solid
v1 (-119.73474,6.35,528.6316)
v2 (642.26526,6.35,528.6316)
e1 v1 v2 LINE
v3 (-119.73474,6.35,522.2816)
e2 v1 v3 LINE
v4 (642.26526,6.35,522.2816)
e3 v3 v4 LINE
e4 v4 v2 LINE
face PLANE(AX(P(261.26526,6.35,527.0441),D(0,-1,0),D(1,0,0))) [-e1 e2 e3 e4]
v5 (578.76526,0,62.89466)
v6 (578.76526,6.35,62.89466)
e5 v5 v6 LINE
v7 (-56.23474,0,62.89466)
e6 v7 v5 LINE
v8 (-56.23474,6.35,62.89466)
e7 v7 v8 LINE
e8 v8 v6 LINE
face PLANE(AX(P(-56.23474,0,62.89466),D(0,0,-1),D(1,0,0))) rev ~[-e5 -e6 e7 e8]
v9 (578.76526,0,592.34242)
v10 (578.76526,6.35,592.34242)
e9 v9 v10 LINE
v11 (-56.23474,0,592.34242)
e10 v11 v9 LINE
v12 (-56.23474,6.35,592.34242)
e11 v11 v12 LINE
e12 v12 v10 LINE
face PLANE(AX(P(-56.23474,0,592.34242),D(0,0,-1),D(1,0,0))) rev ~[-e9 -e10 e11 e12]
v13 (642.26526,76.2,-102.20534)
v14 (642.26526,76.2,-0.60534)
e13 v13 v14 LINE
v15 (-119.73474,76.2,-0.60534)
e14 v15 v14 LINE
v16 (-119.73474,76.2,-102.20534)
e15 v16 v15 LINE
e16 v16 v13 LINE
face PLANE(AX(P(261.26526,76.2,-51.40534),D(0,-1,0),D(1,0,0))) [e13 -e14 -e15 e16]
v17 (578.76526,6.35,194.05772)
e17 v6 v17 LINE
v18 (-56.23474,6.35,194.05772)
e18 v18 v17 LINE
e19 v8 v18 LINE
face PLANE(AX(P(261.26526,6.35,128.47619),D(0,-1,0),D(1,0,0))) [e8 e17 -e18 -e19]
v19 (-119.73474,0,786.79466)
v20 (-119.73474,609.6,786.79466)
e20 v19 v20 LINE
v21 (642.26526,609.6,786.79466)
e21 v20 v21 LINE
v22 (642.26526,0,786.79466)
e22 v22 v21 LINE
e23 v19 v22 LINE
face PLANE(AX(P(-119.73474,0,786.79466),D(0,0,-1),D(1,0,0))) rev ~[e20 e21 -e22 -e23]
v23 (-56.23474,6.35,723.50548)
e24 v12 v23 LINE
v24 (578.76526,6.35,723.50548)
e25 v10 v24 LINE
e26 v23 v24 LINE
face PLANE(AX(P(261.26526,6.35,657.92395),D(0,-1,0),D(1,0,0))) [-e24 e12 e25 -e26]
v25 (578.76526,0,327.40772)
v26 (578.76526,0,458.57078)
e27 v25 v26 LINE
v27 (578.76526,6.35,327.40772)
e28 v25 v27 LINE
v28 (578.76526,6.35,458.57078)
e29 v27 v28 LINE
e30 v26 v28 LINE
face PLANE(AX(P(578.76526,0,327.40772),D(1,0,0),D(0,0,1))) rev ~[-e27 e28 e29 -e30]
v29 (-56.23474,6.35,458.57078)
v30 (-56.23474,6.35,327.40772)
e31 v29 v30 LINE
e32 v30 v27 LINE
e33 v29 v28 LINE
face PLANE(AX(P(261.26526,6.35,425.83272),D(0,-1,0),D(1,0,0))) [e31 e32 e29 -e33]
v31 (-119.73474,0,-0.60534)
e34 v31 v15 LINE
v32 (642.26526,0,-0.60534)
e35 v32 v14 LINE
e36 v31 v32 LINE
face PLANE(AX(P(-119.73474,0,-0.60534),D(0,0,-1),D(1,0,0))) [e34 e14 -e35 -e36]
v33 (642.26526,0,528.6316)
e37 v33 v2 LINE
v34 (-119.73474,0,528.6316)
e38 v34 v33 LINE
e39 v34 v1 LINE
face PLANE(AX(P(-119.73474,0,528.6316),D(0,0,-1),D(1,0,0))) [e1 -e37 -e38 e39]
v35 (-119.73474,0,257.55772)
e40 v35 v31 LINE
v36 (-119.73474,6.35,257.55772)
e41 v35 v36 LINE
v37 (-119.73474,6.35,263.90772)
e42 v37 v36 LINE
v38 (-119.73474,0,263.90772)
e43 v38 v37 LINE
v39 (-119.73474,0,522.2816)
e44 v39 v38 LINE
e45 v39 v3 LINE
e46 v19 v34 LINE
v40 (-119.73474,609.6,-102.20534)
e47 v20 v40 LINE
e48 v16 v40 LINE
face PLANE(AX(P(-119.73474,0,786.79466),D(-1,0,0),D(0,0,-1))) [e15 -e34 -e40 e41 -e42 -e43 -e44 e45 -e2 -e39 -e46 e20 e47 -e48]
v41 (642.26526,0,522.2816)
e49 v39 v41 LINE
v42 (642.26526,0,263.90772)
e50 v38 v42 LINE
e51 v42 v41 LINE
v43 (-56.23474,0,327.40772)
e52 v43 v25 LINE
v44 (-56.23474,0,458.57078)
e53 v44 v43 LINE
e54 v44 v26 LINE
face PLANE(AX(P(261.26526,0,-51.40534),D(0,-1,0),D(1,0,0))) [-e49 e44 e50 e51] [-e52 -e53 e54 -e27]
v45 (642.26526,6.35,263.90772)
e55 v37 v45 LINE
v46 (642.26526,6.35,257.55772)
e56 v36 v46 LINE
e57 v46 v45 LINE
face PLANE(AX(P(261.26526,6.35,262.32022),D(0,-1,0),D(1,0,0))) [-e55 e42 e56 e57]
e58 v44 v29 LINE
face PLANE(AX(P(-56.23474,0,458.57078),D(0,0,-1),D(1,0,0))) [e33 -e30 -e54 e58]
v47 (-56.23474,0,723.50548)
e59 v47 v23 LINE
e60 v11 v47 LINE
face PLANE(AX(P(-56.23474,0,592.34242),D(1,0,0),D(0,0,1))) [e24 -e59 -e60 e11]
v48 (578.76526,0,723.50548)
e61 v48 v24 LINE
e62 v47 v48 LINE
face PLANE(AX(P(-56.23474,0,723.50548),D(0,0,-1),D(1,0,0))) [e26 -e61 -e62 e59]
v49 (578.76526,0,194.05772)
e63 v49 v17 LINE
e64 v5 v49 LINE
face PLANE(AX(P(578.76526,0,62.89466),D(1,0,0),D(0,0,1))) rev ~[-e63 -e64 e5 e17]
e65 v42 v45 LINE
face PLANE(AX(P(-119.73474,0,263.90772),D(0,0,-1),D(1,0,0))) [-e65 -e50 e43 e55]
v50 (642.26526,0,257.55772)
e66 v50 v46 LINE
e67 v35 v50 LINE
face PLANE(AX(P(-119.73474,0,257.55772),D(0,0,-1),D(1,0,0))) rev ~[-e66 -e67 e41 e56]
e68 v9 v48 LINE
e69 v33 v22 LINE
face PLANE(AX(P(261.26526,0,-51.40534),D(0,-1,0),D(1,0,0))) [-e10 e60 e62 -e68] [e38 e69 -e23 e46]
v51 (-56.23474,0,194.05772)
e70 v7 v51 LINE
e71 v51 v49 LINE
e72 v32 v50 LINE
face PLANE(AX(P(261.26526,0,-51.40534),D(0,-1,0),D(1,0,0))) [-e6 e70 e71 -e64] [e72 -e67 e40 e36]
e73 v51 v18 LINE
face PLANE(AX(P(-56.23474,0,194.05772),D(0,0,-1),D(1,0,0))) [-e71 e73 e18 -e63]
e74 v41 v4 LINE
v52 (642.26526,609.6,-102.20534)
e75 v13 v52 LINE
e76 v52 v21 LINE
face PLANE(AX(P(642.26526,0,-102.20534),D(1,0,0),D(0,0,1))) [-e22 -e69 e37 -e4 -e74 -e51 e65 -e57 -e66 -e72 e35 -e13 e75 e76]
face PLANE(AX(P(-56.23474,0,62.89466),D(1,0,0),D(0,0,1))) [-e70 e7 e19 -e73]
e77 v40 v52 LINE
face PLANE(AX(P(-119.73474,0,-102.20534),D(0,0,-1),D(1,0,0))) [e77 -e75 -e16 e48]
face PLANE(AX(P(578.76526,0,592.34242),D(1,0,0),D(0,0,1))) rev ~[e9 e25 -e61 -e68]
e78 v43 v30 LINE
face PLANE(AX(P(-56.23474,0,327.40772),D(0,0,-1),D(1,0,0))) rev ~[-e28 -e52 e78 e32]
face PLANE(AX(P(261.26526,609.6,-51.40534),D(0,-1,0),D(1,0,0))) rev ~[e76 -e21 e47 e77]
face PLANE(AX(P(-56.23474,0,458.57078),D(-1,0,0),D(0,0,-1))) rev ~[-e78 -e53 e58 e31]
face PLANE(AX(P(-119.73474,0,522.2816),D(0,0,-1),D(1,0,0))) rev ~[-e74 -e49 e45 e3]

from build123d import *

# Parameters (mm, degrees)
F0_W     = 762
F0_H     = 101.6
F0_H_2   = 258.16306
F0_W_2   = 635
F0_H_3   = 131.16306
F0_H_4   = 3.175
F0_H_5   = 65.47612
F0_H_6   = 65.68694
F1_DEPTH = 609.6
F2_DEPTH = 6.35
F3_DEPTH = 76.2


# Not quite as in the source:
# - a feature names something its author has since deleted; it is built from what else it names


with BuildPart() as f1:
    # F0 (on Front) → F1 (new body)
    with BuildSketch(Plane.XZ):
        with Locations((261.2652602196, -51.4053403184)):
            Rectangle(F0_W, F0_H)
        with Locations((261.2652602196, 128.4761896816)):
            Rectangle(F0_W, F0_H_2)
        with Locations((261.2652602196, 128.4761896816)):
            Rectangle(F0_W_2, F0_H_3, mode=Mode.SUBTRACT)
        with Locations((261.2652602196, 259.1452196816)):
            Rectangle(F0_W, F0_H_4)
        with Locations((261.2652602196, 262.3202196816)):
            Rectangle(F0_W, F0_H_4)
        Polygon((-119.7347397804, 263.9077196816), (642.2652602196, 263.9077196816), (642.2652602196, 393.0946596816), (578.7652602196, 393.0946596816), (578.7652602196, 327.4077196816), (-56.2347397804, 327.4077196816), (-56.2347397804, 393.0946596816), (-119.7347397804, 393.0946596816), align=None)
        Polygon((578.7652602196, 393.0946596816), (642.2652602196, 393.0946596816), (642.2652602196, 522.2815996816), (-119.7347397804, 522.2815996816), (-119.7347397804, 393.0946596816), (-56.2347397804, 393.0946596816), (-56.2347397804, 458.5707796816), (578.7652602196, 458.5707796816), align=None)
        with Locations((261.2652602196, 523.8690996816)):
            Rectangle(F0_W, F0_H_4)
        with Locations((261.2652602196, 527.0440996816)):
            Rectangle(F0_W, F0_H_4)
        with Locations((261.2652602196, 657.7131296816)):
            Rectangle(F0_W, F0_H_2)
        with Locations((261.2652602196, 657.9239496816)):
            Rectangle(F0_W_2, F0_H_3, mode=Mode.SUBTRACT)
        with Locations((261.2652602196, 657.9239496816)):
            Rectangle(F0_W_2, F0_H_3)
        with Locations((261.2652602196, 425.8327196816)):
            Rectangle(F0_W_2, F0_H_5)
        with Locations((261.2652602196, 360.2511896816)):
            Rectangle(F0_W_2, F0_H_6)
        with Locations((261.2652602196, 128.4761896816)):
            Rectangle(F0_W_2, F0_H_3)
    extrude(amount=-F1_DEPTH)

    # F0 (on Front) → F2 (cut)
    with BuildSketch(Plane.XZ):
        with Locations((261.2652602196, 657.9239496816)):
            Rectangle(F0_W_2, F0_H_3)
        with Locations((261.2652602196, 425.8327196816)):
            Rectangle(F0_W_2, F0_H_5)
        with Locations((261.2652602196, 360.2511896816)):
            Rectangle(F0_W_2, F0_H_6)
        with Locations((261.2652602196, 128.4761896816)):
            Rectangle(F0_W_2, F0_H_3)
        with Locations((261.2652602196, 262.3202196816)):
            Rectangle(F0_W, F0_H_4)
        with Locations((261.2652602196, 259.1452196816)):
            Rectangle(F0_W, F0_H_4)
        with Locations((261.2652602196, 527.0440996816)):
            Rectangle(F0_W, F0_H_4)
        with Locations((261.2652602196, 523.8690996816)):
            Rectangle(F0_W, F0_H_4)
    extrude(amount=-F2_DEPTH, mode=Mode.SUBTRACT)

    # F0 (on Front) → F3 (cut)
    with BuildSketch(Plane.XZ):
        with Locations((261.2652602196, -51.4053403184)):
            Rectangle(F0_W, F0_H)
    extrude(amount=-F3_DEPTH, mode=Mode.SUBTRACT)


solid = f1.part
